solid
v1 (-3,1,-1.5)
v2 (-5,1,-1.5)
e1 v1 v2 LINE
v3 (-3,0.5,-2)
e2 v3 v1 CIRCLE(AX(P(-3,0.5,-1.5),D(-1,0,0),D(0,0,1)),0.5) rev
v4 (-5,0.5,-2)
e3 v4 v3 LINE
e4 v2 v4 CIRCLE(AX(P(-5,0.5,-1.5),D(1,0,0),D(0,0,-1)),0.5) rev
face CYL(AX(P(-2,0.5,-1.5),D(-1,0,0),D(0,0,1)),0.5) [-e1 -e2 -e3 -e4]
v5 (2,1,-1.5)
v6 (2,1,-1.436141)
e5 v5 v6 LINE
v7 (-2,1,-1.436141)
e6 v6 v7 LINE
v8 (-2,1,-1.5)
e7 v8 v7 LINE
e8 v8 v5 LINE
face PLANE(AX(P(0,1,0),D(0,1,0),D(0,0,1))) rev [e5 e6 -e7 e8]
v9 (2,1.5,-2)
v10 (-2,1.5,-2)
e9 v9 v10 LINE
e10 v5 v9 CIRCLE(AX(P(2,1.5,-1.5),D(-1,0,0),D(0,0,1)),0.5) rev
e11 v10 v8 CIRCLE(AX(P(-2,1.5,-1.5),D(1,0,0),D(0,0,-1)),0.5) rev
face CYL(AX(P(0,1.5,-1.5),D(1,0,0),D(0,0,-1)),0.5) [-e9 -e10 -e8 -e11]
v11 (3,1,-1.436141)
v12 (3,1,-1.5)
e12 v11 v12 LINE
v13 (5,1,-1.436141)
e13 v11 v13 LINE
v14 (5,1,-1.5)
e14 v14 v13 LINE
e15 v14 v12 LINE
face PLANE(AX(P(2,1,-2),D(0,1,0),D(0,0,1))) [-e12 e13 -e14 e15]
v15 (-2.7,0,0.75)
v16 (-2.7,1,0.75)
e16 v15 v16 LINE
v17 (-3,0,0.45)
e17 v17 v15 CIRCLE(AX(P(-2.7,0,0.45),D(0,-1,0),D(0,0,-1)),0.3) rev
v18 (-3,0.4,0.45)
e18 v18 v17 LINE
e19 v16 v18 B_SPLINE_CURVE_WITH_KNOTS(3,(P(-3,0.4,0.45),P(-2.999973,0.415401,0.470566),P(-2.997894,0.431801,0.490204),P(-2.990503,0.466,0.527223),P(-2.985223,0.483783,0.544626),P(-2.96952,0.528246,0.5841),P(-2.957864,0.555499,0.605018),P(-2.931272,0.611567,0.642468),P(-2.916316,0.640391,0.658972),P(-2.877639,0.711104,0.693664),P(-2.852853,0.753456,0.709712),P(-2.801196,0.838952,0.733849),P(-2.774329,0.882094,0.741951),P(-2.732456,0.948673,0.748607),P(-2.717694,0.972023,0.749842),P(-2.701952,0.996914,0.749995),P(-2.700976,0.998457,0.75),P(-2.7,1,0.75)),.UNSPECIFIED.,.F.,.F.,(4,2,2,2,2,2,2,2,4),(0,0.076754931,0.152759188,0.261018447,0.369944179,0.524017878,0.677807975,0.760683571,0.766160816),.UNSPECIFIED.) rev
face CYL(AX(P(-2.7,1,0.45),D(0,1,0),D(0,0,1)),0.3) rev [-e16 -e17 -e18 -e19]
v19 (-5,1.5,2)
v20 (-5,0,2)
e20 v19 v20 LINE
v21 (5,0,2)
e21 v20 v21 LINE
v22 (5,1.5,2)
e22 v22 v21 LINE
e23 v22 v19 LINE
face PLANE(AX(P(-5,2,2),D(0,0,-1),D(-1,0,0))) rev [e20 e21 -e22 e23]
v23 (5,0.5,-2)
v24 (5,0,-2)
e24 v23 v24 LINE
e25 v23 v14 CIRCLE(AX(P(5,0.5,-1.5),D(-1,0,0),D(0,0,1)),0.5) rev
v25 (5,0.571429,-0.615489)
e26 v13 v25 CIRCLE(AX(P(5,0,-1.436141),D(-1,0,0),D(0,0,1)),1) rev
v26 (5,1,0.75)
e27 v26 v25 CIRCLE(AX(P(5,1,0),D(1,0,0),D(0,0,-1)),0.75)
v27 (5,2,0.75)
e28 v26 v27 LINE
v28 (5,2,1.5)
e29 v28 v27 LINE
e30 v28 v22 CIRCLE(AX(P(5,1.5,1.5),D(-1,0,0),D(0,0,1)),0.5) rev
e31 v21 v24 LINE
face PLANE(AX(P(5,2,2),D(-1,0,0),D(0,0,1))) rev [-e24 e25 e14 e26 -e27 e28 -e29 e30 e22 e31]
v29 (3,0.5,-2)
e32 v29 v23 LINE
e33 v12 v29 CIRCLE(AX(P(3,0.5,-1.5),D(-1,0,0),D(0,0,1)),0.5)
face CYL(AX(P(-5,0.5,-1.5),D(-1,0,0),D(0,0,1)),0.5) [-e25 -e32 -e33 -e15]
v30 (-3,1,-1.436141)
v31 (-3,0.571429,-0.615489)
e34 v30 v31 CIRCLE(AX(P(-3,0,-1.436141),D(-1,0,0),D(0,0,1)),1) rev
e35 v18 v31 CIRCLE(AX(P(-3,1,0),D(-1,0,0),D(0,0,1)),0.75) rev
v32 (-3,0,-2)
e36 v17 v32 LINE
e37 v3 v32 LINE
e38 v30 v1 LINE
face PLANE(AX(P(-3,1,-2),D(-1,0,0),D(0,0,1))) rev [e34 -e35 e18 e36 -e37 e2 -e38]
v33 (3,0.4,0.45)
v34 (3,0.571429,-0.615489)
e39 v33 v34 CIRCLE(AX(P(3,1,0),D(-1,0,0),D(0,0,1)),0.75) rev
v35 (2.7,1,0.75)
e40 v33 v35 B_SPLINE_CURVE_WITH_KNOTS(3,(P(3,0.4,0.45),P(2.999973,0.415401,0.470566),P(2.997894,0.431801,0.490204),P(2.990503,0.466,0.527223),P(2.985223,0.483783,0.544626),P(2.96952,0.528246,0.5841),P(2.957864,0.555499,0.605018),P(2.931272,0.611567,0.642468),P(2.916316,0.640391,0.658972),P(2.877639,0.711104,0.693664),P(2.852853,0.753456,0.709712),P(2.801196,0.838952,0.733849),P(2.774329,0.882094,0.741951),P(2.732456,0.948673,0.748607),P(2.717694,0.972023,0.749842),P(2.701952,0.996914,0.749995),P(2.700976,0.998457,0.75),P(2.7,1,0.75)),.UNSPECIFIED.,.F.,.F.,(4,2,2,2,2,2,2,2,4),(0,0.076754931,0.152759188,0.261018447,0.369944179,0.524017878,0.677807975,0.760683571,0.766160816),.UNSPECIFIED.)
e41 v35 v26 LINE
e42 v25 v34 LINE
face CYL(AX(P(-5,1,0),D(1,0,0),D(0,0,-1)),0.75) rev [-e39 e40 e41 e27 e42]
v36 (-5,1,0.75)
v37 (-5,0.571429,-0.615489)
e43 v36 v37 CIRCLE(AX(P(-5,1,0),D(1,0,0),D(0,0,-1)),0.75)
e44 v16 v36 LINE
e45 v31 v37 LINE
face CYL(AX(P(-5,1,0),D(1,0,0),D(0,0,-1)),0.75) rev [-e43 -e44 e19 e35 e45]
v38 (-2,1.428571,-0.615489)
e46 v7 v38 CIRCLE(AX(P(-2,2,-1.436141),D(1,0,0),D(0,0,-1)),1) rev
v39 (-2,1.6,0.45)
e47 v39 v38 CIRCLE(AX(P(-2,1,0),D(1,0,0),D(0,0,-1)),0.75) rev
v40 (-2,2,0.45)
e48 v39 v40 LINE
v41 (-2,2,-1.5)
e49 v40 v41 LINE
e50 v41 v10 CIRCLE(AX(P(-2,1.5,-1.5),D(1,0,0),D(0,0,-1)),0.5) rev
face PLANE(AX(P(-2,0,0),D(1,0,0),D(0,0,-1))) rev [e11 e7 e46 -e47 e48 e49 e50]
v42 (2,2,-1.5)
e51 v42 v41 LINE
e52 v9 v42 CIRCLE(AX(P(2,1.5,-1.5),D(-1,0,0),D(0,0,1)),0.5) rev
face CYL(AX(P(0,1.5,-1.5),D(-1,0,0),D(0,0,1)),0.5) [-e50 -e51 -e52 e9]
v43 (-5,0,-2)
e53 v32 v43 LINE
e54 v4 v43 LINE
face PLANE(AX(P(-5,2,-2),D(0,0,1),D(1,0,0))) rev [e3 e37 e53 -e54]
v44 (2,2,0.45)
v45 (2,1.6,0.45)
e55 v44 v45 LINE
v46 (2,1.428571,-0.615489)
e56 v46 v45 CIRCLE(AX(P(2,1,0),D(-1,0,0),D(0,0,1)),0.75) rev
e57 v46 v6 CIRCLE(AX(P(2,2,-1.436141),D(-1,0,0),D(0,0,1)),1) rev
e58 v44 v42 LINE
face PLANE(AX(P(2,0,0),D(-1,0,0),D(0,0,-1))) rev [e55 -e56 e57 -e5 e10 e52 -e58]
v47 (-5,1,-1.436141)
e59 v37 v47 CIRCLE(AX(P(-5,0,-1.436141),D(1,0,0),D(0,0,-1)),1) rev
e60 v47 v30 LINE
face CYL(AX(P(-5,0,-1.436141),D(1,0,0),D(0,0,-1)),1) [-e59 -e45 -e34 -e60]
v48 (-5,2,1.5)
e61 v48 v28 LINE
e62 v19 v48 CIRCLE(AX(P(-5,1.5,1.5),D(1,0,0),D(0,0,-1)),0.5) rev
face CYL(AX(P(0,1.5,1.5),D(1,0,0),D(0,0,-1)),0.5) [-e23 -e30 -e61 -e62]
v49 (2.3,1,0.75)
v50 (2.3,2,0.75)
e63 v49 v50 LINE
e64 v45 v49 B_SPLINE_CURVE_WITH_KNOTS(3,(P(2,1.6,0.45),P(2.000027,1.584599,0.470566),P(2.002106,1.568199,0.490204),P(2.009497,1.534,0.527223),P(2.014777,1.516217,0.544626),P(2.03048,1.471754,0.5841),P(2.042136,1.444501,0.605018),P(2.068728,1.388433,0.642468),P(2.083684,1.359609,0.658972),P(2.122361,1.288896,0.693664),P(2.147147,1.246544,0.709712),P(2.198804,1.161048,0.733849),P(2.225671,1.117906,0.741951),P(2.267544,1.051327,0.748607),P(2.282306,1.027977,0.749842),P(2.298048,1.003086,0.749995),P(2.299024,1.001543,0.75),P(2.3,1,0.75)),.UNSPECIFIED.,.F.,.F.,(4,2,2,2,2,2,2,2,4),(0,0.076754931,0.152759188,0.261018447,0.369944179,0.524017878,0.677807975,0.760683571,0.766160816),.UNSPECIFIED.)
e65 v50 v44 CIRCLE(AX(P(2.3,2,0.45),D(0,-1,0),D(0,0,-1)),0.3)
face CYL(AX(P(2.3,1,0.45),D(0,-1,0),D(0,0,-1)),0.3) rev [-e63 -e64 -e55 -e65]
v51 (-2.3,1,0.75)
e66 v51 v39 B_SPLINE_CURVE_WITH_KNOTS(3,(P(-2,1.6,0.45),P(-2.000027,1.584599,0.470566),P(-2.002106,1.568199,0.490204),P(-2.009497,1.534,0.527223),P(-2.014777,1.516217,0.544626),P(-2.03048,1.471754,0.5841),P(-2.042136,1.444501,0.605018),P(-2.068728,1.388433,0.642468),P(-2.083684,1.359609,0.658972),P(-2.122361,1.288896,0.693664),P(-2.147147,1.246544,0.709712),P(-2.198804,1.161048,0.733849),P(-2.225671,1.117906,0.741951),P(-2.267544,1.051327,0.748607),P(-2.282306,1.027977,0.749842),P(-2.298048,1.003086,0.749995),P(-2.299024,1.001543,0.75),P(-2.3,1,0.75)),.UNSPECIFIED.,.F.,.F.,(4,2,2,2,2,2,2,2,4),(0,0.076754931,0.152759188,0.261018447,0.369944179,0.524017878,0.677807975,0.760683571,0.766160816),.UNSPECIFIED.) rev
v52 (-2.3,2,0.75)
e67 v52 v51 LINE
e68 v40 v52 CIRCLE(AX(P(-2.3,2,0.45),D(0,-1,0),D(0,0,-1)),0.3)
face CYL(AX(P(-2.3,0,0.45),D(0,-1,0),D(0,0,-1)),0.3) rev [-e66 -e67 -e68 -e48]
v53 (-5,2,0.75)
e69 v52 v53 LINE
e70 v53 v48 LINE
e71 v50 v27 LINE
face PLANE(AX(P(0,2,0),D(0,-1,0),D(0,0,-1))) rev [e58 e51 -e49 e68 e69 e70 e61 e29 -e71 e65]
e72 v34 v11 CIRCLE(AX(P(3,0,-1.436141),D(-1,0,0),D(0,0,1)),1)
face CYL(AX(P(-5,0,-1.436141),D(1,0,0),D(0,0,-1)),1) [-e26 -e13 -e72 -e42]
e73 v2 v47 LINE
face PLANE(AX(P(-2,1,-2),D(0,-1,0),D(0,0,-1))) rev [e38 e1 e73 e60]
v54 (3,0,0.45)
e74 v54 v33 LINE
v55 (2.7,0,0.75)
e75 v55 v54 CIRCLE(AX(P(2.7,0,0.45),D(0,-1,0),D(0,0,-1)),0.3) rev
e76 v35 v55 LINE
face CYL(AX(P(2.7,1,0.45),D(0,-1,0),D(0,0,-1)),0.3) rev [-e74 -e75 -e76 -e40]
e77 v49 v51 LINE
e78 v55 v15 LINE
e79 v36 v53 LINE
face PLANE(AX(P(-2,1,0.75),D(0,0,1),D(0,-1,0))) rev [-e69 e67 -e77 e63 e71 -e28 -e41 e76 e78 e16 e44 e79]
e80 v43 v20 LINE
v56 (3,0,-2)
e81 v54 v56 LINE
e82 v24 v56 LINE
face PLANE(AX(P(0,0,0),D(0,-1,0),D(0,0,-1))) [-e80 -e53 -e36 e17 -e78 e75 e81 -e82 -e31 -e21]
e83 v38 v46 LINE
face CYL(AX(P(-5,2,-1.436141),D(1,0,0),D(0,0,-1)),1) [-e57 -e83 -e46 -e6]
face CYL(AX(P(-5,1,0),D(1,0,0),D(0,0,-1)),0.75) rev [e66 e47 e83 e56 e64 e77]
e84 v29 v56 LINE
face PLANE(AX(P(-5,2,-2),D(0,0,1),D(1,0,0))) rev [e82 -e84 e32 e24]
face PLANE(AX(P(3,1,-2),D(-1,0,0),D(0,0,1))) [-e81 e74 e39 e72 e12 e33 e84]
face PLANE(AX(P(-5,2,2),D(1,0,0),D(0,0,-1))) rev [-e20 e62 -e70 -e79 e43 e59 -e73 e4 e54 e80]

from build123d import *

# Parameters (mm, degrees)
ESQUISSE1_W             = 10
ESQUISSE1_H             = 4
BOSS_EXTRU_1_DEPTH      = 2
ESQUISSE2_R             = 0.75
ENL_V_MAT_EXTRU_1_DEPTH = 10
ESQUISSE7_W             = 2.75
ESQUISSE7_H             = 1
ENL_V_MAT_EXTRU_3_DEPTH = 3
ESQUISSE8_W             = 3
ESQUISSE8_H             = 2.75
ENL_V_MAT_EXTRU_5_DEPTH = 1
CONG_1_R                = 1
CONG_2_R                = 0.5
CONG_3_R                = 0.5
CONG_4_R                = 0.3


with BuildPart() as part:
    # Esquisse1 → Boss.-Extru.1 (new body)
    with BuildSketch(Plane(origin=(0, 0, 0), x_dir=(1, 0, 0), z_dir=(0, 1, 0))):
        Rectangle(ESQUISSE1_W, ESQUISSE1_H)
    extrude(amount=BOSS_EXTRU_1_DEPTH)

    # Esquisse2 → Enlèv. mat.-Extru.1 (cut)
    with BuildSketch(Plane(origin=(5, 0, 0), x_dir=(0, 0, -1), z_dir=(1, 0, 0))):
        with Locations((0, 1)):
            Circle(ESQUISSE2_R)
    extrude(amount=-ENL_V_MAT_EXTRU_1_DEPTH, mode=Mode.SUBTRACT)

    # Esquisse7 → Enlèv. mat.-Extru.3 (cut)
    with BuildSketch(Plane.ZY.offset(5)):
        with Locations((-0.625, 1.5)):
            Rectangle(ESQUISSE7_W, ESQUISSE7_H)
    enl_v_mat_extru_3 = extrude(amount=-ENL_V_MAT_EXTRU_3_DEPTH, mode=Mode.SUBTRACT)

    # Symétrie1: Enlèv. mat.-Extru.3 across plane
    add(enl_v_mat_extru_3.mirror(Plane.ZY), mode=Mode.SUBTRACT)

    # Esquisse8 → Enlèv. mat.-Extru.5 (cut)
    with BuildSketch(Plane.XZ):
        with Locations((-1.5, -0.625)):
            Rectangle(ESQUISSE8_W, ESQUISSE8_H)
    enl_v_mat_extru_5 = extrude(amount=-ENL_V_MAT_EXTRU_5_DEPTH, mode=Mode.SUBTRACT)

    # Symétrie3: Enlèv. mat.-Extru.5 across plane
    add(enl_v_mat_extru_5.mirror(Plane.ZY), mode=Mode.SUBTRACT)

    # Congé1
    cong_1_edges = [part.edges().sort_by_distance(p)[0] for p in [
        (-4, 1, -0.75),
        (0, 1, -0.75),
        (4, 1, -0.75),
    ]]
    fillet(cong_1_edges, radius=CONG_1_R)

    # Congé2
    cong_2_edges = [part.edges().sort_by_distance(p)[0] for p in [
        (-4, 1, -2),
        (0, 1, -2),
        (4, 1, -2),
    ]]
    fillet(cong_2_edges, radius=CONG_2_R)

    # Congé3
    cong_3_edges = [part.edges().sort_by_distance(p)[0] for p in [
        (0, 2, -2),
        (0, 2, 2),
    ]]
    fillet(cong_3_edges, radius=CONG_3_R - 0.0001)  # a hair under: the kernel refuses the full size

    # Congé4
    cong_4_edges = [part.edges().sort_by_distance(p)[0] for p in [
        (-2, 1.5, 0.75),
        (2, 1.5, 0.75),
        (-3, 0.5, 0.75),
        (3, 0.5, 0.75),
    ]]
    fillet(cong_4_edges, radius=CONG_4_R)


solid = part.part
